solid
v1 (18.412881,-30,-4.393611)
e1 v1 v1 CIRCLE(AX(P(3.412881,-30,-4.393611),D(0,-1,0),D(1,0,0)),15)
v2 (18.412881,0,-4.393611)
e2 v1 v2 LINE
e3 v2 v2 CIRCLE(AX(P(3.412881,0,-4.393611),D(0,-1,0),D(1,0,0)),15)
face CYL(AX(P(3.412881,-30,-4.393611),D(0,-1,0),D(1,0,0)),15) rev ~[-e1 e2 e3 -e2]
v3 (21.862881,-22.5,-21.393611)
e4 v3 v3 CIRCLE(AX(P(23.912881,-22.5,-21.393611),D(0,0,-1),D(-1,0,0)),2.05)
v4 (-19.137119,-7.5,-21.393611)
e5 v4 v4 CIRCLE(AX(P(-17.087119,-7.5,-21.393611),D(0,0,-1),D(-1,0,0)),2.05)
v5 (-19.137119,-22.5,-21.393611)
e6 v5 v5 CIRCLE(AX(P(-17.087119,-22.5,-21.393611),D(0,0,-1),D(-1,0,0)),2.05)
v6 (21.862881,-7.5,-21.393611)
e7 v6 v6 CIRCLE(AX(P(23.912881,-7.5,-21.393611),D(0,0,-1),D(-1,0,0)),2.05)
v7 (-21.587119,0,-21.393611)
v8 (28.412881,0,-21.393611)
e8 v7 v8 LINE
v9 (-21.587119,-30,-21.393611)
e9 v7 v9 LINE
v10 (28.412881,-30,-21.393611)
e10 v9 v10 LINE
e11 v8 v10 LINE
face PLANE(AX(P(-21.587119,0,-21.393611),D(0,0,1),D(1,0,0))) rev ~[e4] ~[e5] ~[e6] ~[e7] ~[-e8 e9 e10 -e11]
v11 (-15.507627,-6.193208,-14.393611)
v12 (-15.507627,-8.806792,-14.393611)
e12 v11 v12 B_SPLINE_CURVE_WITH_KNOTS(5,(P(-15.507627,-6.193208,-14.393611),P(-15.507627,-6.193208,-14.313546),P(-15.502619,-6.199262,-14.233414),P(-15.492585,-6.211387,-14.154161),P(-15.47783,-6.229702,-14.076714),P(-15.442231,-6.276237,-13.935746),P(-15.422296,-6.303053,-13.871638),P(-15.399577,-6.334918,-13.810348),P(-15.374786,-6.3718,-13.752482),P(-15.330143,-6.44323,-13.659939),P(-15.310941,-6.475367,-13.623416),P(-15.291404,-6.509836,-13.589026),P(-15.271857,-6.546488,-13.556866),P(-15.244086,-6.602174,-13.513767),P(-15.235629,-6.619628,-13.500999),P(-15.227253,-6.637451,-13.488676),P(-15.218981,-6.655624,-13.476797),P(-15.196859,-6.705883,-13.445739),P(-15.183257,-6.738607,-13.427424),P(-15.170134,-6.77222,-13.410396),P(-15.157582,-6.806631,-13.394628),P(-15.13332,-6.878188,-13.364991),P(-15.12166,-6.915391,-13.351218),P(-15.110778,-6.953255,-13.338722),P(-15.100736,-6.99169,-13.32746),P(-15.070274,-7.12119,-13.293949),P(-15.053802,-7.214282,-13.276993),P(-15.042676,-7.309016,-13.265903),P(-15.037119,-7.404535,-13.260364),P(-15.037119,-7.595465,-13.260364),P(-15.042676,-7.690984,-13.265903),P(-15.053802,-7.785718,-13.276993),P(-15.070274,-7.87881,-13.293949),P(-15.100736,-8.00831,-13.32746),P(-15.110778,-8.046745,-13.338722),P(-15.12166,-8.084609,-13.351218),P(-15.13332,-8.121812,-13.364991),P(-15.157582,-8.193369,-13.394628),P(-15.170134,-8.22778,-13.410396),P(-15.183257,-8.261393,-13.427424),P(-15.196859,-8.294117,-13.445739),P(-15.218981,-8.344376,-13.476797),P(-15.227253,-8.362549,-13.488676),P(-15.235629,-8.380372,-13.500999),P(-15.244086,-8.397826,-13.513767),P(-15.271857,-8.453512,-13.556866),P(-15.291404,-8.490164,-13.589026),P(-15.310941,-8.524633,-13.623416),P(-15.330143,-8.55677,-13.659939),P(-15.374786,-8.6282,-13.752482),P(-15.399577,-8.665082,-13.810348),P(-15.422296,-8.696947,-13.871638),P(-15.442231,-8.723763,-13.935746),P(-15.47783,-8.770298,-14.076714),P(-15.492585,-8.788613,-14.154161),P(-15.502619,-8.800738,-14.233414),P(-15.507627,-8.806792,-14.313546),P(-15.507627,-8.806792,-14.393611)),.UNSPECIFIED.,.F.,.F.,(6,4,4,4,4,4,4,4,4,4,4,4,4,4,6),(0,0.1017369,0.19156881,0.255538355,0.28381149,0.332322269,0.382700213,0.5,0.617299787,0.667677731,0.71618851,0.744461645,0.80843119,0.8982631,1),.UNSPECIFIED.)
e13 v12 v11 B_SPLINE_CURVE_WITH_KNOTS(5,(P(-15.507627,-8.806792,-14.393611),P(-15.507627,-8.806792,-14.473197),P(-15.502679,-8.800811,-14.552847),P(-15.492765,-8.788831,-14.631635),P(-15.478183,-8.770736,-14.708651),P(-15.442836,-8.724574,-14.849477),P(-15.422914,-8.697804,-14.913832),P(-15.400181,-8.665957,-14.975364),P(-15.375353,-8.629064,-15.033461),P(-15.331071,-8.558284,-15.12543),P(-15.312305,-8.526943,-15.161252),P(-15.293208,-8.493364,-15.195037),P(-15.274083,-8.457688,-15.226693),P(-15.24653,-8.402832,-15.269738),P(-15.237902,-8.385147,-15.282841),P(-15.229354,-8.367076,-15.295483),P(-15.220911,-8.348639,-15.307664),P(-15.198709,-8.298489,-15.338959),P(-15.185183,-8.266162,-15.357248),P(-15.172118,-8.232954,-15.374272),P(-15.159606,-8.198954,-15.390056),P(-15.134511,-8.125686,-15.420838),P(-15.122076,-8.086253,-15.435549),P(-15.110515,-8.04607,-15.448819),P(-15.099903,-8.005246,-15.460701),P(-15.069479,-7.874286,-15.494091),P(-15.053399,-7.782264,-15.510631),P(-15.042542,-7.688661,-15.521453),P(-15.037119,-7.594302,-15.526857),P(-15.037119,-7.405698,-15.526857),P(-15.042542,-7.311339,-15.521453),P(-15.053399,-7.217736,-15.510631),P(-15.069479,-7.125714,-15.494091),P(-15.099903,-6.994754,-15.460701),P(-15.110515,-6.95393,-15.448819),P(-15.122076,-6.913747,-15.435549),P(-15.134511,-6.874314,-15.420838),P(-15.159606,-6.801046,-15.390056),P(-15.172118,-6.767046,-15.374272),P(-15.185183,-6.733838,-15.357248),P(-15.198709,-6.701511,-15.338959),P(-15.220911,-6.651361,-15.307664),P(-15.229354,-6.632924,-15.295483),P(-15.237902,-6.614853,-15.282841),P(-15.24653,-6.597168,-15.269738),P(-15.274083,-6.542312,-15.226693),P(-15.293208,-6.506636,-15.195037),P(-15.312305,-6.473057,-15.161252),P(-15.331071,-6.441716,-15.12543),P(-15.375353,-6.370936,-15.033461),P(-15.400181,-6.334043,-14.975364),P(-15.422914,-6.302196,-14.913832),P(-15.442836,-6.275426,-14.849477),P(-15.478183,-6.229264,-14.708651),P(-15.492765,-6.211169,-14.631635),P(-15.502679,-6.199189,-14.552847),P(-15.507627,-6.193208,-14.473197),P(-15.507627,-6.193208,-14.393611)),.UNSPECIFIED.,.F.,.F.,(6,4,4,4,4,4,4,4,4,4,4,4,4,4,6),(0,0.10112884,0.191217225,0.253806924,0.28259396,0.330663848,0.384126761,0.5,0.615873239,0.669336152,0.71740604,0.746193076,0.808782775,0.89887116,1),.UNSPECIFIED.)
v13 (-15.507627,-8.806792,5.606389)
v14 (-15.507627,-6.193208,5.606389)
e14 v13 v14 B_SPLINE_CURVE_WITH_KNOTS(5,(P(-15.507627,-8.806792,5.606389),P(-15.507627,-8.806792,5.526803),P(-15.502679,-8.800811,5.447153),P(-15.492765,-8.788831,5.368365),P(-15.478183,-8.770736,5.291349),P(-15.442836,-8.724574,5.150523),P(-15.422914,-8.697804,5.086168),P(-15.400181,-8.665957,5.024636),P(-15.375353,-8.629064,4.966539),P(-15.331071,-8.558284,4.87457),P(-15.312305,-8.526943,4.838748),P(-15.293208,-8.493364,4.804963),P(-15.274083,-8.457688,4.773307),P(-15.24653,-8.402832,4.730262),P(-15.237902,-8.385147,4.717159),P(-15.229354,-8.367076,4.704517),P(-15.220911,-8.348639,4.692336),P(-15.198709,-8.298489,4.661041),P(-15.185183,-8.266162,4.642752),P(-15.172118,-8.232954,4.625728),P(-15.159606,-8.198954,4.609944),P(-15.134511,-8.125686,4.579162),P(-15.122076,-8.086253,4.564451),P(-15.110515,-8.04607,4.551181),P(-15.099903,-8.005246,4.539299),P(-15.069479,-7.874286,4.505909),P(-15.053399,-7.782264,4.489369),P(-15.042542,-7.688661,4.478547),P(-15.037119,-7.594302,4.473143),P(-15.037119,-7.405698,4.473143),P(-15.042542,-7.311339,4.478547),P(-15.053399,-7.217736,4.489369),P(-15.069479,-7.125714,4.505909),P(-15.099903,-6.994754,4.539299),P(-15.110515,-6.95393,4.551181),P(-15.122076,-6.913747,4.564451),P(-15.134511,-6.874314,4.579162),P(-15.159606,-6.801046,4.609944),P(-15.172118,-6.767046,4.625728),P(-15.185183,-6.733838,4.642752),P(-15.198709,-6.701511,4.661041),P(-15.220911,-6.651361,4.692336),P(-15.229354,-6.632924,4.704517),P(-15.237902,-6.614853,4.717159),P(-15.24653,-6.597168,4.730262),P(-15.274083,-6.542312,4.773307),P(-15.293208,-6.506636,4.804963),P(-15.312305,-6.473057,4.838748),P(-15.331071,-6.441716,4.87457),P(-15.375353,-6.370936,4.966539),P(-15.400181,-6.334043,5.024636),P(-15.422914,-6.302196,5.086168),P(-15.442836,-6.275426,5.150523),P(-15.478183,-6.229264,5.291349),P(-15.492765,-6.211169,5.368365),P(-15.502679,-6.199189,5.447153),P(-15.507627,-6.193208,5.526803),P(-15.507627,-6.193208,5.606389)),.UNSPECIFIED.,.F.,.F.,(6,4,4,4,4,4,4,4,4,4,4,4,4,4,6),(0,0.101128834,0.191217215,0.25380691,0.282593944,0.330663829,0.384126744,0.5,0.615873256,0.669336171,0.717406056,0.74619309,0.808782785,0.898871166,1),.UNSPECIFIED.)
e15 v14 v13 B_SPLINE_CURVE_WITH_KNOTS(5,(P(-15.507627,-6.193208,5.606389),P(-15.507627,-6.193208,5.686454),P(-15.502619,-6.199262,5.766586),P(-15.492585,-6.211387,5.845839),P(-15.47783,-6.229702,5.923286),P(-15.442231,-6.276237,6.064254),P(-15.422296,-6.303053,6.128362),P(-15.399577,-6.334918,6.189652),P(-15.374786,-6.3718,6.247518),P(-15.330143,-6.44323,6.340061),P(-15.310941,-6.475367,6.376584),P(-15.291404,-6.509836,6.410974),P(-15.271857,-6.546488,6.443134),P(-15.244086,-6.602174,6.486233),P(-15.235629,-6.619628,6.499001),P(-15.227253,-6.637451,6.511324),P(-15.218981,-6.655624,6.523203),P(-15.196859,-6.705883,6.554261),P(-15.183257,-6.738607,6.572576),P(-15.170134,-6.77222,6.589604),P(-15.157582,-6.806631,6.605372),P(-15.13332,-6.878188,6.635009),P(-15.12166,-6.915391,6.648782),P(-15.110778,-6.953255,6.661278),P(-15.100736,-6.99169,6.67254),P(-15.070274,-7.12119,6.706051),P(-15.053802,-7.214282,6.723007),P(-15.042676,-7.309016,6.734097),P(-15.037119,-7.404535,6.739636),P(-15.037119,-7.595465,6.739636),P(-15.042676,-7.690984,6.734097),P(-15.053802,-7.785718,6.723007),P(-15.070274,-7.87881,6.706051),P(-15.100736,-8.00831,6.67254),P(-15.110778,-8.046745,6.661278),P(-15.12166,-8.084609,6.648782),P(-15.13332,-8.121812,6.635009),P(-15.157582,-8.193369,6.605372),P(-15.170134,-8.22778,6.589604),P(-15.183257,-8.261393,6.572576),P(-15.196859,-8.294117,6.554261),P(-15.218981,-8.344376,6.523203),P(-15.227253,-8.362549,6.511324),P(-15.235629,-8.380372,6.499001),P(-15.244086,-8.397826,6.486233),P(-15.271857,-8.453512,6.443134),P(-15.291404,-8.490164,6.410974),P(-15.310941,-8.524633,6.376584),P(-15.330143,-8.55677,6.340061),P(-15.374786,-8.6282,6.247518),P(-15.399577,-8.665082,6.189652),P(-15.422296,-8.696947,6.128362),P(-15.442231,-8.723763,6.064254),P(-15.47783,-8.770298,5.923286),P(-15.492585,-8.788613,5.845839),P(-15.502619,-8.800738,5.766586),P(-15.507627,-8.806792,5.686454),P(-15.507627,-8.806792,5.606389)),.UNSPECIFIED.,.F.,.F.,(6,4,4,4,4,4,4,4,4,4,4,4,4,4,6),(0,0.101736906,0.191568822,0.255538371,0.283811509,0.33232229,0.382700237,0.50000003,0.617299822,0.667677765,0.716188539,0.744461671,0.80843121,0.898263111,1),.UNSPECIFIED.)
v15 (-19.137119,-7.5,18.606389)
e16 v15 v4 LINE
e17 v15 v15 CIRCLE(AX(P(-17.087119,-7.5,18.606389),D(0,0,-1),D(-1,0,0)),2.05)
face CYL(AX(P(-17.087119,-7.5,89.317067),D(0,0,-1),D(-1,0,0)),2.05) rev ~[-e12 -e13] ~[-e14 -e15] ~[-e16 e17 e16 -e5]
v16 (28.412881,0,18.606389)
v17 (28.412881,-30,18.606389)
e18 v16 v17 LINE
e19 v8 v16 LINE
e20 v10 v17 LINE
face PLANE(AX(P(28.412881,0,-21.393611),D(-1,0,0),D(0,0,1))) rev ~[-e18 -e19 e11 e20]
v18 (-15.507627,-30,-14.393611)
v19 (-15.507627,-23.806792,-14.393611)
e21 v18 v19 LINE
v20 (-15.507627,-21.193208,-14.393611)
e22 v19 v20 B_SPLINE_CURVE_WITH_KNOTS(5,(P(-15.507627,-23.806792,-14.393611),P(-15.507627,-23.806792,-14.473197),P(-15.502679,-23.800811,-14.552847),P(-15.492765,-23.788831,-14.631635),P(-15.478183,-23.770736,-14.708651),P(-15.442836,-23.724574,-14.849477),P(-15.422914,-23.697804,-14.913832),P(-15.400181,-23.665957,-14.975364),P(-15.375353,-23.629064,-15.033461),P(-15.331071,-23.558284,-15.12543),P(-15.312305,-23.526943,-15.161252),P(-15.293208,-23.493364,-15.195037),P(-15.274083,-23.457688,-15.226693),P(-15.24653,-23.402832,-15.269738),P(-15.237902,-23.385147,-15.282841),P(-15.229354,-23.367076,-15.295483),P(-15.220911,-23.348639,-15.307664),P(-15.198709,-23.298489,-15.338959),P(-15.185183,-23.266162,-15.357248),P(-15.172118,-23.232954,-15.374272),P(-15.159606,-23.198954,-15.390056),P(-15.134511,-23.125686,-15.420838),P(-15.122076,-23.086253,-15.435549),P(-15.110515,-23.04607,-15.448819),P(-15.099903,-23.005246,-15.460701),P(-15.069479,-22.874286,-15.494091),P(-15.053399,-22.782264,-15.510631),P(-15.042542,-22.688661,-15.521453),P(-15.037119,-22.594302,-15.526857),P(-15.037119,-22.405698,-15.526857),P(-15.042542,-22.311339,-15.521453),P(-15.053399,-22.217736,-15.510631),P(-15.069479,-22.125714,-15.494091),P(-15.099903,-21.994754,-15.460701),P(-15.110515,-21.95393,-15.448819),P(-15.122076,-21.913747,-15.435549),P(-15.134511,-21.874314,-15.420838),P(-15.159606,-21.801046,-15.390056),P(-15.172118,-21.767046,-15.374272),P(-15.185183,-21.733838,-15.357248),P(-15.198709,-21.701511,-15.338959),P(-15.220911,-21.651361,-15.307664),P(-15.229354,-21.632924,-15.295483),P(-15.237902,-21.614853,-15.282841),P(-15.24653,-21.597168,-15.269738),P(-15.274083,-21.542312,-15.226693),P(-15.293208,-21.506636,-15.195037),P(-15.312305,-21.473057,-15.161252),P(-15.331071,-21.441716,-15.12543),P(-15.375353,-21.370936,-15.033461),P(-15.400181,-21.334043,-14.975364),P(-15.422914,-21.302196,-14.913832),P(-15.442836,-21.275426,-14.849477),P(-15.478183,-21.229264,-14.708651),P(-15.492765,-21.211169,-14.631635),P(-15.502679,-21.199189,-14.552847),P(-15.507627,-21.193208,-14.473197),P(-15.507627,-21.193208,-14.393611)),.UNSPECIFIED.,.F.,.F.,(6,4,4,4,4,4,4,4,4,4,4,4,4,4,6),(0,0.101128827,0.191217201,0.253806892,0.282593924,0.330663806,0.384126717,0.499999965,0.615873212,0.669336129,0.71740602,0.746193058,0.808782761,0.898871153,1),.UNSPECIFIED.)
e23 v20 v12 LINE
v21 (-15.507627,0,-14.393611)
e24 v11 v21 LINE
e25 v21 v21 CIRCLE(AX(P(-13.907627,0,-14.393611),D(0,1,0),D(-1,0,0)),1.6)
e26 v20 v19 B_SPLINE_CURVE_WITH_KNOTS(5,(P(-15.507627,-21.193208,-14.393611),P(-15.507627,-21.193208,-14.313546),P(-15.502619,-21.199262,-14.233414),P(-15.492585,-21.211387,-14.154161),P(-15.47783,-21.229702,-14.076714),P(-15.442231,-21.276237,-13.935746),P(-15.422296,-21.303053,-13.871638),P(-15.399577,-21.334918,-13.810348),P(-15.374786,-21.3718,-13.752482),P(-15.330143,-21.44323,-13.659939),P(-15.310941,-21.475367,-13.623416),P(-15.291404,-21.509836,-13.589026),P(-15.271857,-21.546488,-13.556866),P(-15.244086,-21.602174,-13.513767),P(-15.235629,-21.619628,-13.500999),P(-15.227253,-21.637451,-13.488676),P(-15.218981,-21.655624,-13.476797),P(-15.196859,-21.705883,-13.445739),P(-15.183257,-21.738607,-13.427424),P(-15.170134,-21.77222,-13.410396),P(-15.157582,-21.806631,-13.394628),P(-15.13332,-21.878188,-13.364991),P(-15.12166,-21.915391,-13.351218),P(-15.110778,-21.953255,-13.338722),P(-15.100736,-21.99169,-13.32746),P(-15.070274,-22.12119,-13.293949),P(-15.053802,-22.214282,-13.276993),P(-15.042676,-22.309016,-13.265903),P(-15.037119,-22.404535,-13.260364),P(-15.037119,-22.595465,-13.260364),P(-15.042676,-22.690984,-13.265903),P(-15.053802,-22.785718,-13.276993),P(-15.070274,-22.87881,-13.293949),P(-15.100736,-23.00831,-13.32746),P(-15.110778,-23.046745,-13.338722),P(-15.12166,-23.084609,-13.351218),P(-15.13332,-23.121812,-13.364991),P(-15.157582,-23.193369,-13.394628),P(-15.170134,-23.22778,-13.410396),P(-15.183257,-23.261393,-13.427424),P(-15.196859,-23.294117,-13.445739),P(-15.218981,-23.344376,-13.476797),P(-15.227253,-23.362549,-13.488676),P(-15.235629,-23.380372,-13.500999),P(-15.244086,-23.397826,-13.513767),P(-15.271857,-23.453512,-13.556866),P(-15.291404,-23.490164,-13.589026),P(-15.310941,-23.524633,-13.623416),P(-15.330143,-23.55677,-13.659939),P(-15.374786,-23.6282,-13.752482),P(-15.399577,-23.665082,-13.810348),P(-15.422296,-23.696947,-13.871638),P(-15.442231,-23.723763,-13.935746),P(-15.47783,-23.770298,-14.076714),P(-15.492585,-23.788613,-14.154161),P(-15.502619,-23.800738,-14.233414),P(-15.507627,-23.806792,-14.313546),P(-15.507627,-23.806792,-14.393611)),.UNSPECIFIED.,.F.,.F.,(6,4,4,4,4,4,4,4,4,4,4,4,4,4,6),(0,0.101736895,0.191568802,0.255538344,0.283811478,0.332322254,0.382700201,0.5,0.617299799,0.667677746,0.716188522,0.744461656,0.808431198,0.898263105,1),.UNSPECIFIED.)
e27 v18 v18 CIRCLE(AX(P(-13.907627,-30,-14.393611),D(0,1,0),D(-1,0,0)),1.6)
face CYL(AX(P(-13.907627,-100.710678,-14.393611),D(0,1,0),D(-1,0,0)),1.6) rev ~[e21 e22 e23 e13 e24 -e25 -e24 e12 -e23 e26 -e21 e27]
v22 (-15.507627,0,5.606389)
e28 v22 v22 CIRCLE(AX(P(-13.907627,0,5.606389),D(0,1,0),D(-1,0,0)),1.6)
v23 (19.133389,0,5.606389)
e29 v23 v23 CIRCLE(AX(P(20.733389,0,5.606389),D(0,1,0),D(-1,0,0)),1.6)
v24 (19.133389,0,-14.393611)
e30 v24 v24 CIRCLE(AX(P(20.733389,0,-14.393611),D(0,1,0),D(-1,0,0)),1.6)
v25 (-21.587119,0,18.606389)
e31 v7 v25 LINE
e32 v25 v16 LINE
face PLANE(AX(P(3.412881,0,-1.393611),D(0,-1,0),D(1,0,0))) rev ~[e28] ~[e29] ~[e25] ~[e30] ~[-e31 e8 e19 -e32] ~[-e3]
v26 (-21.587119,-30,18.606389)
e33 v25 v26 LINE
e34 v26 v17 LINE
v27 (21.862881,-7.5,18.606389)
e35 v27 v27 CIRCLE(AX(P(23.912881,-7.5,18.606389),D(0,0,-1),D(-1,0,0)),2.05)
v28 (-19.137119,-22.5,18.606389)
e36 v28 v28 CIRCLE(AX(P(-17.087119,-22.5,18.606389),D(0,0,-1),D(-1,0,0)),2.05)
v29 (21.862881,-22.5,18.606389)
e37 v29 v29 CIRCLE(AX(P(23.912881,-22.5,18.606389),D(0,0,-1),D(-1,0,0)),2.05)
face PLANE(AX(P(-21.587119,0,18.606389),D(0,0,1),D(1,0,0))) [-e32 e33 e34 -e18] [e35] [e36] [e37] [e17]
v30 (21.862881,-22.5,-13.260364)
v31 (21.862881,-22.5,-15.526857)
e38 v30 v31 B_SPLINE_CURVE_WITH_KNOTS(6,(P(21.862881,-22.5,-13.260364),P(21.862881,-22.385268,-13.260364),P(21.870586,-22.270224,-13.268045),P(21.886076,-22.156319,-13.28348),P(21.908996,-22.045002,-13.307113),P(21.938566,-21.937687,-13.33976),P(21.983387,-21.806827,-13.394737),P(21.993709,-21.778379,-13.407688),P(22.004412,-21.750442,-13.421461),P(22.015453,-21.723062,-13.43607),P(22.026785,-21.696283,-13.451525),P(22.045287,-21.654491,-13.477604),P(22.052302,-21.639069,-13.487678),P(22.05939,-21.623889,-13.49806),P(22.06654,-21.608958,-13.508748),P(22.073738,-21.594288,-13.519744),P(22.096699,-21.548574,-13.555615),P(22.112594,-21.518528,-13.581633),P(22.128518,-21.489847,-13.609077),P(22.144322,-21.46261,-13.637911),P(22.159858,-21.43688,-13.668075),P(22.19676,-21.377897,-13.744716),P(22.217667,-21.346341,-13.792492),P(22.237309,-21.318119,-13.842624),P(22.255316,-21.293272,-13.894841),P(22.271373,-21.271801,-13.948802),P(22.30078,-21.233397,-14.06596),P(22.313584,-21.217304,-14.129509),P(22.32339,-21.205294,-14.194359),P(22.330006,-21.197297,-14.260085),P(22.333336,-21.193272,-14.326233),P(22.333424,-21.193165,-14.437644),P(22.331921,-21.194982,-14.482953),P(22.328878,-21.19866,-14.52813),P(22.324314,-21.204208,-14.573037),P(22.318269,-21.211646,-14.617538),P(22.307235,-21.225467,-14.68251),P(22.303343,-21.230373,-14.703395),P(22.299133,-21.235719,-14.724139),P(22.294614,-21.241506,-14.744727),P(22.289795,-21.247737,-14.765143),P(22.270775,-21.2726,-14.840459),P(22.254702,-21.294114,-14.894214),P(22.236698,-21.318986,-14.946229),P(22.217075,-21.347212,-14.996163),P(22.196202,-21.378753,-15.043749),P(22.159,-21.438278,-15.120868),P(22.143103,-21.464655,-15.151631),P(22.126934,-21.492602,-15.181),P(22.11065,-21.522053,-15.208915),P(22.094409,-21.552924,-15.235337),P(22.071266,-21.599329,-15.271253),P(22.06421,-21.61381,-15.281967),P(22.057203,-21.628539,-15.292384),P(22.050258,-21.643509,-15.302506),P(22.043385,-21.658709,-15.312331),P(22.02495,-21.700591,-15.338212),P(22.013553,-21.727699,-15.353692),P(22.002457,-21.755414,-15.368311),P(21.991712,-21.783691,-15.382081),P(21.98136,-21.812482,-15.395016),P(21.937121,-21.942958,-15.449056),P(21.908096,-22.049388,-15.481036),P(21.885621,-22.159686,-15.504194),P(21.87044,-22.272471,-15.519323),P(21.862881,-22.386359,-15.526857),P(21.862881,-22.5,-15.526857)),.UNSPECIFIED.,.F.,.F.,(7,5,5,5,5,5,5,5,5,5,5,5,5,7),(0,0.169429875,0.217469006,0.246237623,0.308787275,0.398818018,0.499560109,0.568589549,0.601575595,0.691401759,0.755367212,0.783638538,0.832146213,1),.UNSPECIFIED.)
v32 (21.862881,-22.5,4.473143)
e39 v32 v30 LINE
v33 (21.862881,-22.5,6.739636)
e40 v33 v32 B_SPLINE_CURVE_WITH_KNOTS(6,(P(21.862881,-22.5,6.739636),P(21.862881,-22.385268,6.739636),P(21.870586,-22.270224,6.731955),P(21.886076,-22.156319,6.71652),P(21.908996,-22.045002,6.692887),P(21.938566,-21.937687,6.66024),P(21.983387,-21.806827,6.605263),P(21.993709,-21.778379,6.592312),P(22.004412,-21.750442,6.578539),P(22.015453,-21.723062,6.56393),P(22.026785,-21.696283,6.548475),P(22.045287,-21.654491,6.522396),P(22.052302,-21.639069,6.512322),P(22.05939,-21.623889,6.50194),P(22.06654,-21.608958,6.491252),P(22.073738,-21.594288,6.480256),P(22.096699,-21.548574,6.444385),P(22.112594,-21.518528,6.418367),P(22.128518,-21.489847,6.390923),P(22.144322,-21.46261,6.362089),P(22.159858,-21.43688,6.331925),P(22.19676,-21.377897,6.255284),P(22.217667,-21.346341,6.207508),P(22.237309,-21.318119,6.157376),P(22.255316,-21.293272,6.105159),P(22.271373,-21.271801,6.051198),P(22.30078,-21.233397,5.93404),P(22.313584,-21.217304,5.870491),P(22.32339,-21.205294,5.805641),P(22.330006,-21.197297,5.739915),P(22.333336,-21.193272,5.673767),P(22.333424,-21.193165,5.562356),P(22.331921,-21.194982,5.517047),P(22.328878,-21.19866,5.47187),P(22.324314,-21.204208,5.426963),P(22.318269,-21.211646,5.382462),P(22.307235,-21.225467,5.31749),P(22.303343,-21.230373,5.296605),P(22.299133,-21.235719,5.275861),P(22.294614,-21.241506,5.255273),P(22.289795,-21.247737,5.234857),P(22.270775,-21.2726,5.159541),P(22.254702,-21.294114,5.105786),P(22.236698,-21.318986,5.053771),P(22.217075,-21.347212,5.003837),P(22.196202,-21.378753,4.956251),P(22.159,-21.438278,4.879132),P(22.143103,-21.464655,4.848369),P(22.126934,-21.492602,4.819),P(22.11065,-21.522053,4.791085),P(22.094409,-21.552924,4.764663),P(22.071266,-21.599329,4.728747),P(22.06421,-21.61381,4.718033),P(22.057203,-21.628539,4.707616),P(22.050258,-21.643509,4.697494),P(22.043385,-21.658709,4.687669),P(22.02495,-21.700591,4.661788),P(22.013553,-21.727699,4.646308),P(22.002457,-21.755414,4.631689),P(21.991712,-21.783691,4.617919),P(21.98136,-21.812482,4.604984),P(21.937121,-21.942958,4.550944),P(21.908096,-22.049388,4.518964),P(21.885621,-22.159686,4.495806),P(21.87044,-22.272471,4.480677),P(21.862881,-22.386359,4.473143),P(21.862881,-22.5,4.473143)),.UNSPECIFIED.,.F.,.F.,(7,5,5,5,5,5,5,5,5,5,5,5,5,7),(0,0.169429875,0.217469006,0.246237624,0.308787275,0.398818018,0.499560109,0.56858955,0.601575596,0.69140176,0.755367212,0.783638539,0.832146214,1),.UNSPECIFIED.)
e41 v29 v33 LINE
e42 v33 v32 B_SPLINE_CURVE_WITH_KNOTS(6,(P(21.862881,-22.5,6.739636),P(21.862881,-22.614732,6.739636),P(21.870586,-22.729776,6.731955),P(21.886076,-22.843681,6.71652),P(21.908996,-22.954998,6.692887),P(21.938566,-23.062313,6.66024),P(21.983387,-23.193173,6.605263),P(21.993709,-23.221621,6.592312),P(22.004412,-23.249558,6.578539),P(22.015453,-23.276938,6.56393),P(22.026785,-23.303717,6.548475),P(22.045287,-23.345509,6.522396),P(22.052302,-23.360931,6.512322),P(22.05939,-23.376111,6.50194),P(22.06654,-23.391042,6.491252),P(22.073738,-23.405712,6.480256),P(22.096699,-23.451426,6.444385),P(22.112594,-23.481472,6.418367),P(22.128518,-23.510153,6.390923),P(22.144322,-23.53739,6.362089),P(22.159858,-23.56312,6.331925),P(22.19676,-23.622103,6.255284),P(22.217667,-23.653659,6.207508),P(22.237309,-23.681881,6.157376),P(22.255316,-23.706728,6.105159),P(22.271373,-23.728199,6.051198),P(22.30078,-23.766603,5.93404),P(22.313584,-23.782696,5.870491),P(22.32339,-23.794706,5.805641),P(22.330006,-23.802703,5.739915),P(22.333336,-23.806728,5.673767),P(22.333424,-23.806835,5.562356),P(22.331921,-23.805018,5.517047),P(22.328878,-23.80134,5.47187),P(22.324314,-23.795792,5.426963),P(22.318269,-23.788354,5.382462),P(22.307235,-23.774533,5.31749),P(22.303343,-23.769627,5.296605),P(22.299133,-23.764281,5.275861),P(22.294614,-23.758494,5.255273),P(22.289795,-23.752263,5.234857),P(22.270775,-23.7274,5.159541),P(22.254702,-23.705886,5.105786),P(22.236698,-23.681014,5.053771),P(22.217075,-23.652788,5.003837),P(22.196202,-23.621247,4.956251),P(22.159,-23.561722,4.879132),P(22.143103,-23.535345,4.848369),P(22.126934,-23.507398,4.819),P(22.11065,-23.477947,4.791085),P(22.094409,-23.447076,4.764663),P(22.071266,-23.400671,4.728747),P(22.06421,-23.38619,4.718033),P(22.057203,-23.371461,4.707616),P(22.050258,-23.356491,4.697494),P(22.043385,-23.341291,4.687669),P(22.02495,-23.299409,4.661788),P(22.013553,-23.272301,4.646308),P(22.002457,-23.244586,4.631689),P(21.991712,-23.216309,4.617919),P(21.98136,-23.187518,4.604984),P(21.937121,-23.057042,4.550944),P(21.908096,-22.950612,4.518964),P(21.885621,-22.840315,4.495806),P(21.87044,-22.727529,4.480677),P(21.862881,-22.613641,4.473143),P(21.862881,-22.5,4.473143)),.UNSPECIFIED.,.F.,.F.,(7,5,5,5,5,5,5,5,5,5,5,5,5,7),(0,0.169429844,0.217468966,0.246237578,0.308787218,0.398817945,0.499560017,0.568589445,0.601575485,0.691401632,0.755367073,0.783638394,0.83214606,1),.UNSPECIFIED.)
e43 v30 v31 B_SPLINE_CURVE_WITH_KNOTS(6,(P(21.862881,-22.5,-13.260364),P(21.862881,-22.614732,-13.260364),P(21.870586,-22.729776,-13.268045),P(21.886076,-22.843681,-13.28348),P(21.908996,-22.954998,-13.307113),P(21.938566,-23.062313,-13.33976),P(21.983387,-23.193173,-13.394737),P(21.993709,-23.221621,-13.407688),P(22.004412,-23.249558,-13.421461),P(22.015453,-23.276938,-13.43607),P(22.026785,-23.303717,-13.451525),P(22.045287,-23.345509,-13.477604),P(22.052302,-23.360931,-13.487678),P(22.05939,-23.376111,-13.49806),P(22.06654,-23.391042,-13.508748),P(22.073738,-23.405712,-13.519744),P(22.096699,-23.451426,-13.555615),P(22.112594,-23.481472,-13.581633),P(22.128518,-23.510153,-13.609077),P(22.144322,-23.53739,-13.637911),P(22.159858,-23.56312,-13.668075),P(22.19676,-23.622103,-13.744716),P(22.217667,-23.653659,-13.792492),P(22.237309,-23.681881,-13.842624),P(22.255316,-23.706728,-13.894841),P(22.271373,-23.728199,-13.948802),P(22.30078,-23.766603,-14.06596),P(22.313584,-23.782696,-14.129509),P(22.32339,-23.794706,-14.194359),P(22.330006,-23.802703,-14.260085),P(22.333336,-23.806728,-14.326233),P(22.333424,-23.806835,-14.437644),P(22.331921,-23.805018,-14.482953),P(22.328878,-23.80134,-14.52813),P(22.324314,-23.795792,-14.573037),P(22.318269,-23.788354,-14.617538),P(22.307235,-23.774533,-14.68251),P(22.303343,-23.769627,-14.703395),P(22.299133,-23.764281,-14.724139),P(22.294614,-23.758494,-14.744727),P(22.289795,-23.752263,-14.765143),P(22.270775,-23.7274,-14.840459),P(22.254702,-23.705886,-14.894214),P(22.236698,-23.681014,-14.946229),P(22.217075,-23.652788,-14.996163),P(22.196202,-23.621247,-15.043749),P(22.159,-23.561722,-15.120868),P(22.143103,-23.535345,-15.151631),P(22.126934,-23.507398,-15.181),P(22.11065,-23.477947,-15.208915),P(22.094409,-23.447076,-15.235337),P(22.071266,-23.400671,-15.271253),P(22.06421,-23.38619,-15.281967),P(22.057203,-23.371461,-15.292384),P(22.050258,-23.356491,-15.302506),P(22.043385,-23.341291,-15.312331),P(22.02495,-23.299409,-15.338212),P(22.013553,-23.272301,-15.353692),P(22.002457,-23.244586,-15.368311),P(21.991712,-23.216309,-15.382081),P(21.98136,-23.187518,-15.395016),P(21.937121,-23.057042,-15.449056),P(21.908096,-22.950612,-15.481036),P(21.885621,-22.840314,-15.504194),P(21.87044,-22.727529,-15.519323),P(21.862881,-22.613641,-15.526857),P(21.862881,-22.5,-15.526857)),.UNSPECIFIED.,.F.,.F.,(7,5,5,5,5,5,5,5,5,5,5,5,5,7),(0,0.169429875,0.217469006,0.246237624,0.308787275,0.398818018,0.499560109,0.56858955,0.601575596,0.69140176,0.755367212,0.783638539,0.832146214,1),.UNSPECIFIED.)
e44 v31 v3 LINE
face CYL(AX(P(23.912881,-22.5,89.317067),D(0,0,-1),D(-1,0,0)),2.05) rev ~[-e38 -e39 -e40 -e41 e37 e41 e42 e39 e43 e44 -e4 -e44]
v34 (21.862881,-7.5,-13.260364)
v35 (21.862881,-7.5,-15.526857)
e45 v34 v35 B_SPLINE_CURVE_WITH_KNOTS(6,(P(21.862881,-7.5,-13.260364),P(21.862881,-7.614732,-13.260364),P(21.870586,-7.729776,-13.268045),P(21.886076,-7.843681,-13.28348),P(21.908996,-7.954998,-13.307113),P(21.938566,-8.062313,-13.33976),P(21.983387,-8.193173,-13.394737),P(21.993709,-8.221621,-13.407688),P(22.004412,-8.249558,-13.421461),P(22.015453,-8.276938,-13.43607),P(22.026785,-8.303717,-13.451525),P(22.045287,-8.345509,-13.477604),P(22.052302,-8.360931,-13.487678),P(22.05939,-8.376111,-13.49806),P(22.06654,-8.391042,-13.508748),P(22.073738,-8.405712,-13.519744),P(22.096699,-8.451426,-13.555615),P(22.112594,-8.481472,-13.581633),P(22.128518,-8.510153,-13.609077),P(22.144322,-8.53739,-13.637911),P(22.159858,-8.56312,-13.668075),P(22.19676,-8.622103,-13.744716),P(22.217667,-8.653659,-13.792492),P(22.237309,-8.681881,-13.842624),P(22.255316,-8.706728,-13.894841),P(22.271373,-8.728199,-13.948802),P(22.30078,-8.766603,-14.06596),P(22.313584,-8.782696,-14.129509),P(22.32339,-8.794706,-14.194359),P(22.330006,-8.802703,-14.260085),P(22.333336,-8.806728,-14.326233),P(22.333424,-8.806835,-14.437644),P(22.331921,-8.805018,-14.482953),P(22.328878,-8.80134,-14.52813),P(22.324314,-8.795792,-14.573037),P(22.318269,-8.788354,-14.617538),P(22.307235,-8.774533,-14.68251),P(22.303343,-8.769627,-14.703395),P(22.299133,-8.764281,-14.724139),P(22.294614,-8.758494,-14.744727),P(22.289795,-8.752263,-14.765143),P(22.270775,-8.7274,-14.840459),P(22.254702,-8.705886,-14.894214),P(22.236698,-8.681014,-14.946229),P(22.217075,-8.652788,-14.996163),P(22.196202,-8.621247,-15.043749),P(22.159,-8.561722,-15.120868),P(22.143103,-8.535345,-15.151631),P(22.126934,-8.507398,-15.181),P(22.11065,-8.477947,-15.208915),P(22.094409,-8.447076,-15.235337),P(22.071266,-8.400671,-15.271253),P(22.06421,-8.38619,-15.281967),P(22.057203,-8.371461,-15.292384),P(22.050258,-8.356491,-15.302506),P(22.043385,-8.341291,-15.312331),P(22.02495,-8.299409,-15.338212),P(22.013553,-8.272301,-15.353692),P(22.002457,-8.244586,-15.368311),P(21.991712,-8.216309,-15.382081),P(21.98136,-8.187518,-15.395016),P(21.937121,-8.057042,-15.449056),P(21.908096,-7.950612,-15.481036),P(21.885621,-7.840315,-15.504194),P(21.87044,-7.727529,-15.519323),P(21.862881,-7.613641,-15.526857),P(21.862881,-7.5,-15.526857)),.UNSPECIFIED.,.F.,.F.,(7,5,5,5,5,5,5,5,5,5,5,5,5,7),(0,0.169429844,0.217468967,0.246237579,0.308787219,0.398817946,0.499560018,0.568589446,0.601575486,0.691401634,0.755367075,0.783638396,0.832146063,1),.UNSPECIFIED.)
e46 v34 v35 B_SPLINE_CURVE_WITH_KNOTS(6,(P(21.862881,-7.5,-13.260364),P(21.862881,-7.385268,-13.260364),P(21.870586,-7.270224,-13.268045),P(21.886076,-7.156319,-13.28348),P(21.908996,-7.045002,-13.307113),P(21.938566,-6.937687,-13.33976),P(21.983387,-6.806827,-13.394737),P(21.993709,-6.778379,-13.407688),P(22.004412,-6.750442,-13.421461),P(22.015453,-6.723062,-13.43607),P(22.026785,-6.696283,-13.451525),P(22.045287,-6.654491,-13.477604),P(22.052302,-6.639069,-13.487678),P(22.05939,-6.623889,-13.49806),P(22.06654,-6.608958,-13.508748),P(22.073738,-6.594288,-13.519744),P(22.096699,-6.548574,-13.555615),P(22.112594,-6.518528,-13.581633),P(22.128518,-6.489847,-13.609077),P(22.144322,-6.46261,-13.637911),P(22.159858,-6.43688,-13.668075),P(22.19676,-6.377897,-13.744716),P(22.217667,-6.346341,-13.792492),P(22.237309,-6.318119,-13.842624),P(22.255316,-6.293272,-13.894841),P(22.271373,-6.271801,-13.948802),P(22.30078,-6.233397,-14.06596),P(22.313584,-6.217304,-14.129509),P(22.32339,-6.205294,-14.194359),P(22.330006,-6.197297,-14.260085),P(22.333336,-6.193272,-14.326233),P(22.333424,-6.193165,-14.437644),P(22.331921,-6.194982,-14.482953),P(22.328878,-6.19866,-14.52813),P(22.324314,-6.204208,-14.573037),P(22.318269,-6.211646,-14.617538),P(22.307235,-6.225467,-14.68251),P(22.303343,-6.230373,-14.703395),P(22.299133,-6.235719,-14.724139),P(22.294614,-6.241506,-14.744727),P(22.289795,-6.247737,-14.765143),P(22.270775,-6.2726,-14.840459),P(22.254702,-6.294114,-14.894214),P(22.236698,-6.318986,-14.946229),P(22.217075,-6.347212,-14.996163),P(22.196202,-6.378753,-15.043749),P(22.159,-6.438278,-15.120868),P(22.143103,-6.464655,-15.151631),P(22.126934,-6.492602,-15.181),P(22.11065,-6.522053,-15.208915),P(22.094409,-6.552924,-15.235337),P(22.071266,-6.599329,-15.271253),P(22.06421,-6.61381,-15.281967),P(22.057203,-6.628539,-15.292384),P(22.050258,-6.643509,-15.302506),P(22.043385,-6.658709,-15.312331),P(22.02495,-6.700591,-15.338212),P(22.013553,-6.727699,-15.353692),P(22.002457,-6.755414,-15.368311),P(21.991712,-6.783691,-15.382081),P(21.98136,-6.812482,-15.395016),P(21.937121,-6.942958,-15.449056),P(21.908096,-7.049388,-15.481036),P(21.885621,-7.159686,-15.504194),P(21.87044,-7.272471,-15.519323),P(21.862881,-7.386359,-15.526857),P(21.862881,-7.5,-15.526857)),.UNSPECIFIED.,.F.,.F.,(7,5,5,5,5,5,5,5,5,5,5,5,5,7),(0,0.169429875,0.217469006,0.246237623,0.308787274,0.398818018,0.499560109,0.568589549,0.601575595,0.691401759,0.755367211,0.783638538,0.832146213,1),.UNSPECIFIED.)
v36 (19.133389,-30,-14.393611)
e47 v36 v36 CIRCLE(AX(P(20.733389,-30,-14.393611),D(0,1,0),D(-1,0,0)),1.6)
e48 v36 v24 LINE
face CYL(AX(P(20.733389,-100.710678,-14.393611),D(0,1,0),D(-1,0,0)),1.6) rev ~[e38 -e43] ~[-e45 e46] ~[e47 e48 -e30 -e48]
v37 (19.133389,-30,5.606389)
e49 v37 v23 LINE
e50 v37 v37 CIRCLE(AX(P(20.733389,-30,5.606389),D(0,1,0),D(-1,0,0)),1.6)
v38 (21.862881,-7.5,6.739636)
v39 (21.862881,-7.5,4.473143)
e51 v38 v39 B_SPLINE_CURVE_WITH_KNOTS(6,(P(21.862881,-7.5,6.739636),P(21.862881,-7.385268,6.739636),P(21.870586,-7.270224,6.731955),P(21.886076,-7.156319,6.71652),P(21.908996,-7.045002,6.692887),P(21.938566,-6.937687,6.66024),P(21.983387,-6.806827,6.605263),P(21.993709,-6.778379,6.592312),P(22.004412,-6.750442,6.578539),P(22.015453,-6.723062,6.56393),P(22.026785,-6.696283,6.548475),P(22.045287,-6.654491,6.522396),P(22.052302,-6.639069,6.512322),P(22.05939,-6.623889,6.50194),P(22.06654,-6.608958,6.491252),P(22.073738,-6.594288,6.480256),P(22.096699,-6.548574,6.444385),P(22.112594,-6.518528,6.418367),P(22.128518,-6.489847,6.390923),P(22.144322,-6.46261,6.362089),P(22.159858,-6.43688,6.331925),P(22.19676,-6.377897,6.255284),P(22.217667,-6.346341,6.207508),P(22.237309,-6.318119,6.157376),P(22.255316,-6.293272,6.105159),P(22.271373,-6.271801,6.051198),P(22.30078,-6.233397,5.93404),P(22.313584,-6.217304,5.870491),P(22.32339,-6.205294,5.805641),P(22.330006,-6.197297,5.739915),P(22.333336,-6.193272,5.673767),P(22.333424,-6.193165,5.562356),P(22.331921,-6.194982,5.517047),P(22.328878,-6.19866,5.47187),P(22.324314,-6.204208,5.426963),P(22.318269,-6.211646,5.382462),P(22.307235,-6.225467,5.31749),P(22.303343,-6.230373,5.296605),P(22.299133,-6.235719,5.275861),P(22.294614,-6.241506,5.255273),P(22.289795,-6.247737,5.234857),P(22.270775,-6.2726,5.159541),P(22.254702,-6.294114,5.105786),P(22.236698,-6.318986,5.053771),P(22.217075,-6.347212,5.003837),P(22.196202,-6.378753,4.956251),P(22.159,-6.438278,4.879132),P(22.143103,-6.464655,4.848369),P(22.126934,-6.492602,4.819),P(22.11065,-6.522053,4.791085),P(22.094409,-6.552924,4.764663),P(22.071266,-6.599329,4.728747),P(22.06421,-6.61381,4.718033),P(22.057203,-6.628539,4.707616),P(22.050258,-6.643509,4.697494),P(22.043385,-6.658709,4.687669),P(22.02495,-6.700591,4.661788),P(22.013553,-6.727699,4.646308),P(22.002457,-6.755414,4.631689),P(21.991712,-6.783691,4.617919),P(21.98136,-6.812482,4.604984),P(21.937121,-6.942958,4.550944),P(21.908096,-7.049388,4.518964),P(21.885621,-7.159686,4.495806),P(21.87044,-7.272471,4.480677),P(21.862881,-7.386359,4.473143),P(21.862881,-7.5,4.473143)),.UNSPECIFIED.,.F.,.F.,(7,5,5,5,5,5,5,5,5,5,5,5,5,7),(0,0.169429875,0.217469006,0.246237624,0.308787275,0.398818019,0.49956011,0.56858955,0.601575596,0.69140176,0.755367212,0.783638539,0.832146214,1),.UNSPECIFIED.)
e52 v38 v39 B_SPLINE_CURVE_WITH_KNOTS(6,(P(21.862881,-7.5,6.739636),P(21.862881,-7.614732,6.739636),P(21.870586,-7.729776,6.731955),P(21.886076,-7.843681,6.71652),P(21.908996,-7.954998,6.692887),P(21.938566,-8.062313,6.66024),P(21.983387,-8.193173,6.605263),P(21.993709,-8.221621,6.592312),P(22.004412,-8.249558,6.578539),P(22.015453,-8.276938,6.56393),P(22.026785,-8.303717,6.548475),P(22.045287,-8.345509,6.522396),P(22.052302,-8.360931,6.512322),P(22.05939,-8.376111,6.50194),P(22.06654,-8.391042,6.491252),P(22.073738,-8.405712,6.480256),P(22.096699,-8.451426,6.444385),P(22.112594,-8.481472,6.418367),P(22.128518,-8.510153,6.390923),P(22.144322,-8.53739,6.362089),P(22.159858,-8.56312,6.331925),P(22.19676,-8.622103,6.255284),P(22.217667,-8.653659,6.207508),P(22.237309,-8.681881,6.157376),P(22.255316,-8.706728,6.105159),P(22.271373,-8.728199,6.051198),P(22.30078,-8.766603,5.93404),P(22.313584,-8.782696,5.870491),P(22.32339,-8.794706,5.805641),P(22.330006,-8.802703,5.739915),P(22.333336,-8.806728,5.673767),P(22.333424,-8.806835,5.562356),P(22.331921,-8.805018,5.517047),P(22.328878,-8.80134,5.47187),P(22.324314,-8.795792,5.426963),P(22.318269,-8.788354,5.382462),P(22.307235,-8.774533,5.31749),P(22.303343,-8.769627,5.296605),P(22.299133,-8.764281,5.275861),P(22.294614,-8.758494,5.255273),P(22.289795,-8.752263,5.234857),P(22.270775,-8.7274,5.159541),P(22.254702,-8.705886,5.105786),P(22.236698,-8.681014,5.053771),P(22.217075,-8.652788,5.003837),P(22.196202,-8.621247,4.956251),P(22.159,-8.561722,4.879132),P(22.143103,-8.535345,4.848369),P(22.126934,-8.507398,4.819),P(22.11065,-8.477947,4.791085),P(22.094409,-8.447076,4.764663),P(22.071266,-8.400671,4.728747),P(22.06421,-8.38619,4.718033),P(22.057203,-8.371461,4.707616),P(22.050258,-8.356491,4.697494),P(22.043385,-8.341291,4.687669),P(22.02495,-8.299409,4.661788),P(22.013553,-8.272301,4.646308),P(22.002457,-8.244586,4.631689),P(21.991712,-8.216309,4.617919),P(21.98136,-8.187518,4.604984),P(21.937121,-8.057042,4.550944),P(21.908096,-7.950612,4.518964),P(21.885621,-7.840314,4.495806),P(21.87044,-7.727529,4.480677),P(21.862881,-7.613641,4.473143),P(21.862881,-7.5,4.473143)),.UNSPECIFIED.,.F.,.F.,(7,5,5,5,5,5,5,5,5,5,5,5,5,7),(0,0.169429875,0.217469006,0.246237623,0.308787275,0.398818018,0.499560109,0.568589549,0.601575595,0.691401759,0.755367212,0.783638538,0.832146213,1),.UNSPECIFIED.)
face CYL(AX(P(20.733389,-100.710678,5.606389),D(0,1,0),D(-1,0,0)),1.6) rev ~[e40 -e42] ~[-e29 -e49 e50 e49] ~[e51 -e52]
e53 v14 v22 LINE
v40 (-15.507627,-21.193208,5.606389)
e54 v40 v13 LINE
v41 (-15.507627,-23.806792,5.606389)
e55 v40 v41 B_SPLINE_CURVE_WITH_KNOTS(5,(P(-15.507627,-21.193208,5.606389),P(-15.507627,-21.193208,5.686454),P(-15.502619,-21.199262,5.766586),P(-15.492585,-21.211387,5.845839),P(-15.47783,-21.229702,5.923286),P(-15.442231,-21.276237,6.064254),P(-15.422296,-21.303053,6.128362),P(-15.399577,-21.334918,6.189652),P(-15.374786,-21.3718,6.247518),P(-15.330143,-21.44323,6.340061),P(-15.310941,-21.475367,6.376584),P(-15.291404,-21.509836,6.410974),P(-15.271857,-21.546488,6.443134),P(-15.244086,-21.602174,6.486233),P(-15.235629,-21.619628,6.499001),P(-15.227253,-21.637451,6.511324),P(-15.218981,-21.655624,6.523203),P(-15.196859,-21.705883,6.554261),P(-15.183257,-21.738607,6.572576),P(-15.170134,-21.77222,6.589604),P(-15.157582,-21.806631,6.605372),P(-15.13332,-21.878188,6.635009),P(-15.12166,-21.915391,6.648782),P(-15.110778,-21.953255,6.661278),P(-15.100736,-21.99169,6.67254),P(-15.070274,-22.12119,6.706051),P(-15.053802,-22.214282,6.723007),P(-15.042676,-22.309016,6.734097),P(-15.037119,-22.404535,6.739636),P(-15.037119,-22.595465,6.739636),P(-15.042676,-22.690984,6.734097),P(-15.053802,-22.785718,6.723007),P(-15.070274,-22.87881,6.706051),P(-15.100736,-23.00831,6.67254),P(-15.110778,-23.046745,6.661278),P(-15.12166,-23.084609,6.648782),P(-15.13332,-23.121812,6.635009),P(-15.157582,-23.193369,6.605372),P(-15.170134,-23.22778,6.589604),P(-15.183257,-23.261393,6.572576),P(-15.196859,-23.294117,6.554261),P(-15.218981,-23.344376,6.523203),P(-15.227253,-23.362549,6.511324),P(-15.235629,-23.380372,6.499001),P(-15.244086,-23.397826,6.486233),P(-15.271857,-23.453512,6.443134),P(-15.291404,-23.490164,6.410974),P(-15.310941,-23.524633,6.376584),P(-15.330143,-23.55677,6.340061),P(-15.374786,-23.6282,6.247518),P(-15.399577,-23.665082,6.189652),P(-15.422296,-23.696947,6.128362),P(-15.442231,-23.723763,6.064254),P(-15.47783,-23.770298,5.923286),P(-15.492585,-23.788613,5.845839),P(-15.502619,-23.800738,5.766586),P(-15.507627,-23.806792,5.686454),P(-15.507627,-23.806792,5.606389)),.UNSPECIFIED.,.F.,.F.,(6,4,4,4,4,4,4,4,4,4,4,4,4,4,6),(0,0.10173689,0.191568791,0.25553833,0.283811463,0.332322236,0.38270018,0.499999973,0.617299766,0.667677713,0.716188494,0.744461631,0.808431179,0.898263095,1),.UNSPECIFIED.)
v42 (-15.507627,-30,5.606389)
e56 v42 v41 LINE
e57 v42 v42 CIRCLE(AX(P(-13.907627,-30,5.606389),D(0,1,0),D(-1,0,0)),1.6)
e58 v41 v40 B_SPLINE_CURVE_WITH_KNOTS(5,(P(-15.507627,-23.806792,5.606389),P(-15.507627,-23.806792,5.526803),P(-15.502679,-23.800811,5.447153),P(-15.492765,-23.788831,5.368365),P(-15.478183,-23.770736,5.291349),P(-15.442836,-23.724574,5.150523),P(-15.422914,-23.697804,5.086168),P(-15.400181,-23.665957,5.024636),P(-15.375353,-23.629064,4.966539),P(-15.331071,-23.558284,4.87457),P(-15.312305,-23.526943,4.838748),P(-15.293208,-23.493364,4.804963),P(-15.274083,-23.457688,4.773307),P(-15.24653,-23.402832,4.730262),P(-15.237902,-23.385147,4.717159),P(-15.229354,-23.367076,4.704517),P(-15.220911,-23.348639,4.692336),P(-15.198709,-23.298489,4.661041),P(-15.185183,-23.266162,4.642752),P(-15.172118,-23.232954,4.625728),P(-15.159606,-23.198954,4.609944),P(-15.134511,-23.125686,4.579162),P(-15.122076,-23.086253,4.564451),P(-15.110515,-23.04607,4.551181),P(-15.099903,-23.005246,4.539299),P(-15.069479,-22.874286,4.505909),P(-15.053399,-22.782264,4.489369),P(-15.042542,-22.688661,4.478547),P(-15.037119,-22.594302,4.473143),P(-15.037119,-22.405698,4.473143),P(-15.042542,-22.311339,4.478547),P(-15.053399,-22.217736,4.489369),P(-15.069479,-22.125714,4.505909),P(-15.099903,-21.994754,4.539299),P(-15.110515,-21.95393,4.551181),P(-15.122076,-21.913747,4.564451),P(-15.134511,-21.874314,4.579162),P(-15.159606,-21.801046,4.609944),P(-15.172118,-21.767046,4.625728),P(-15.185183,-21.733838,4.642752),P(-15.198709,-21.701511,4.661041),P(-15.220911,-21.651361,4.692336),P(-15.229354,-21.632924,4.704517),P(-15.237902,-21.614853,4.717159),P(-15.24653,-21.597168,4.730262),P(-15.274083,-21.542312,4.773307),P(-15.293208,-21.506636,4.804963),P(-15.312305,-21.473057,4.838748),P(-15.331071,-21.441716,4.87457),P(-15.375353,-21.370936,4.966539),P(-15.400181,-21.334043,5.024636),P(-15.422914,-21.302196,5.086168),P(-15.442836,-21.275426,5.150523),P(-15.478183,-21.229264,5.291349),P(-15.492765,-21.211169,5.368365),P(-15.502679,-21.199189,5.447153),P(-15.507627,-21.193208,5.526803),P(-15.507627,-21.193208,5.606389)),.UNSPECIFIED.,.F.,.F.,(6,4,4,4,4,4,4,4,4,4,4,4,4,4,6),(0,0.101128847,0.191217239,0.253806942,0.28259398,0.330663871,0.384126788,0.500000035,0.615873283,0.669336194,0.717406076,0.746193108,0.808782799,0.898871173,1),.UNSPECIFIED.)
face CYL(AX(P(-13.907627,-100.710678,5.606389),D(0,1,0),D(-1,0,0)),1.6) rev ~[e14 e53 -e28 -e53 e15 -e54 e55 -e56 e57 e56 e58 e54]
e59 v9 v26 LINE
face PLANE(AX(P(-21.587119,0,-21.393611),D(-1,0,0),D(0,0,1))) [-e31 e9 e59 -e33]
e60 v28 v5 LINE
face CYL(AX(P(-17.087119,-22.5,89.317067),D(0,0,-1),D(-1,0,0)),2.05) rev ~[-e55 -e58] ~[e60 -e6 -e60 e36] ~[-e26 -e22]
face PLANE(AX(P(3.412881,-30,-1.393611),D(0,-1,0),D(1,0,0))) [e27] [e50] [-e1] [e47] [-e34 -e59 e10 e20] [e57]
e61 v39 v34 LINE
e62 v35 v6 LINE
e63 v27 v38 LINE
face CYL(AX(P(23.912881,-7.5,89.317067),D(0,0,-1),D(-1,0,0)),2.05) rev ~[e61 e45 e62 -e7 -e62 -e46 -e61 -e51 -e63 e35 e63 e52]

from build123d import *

# Parameters (mm, degrees)
F0_W     = 50
F0_H     = 40
F1_DEPTH = 30
F2_R     = 15
F3_DEPTH = 30.001
F4_D     = 3.2
F6_D     = 4.1


# Not quite as in the source:
# - a feature names something its author has since deleted; it is built from what else it names


with BuildPart() as f1:
    # F0 (on Front) → F1 (new body)
    with BuildSketch(Plane.XZ):
        with Locations((3.412880823, -1.3936108311)):
            Rectangle(F0_W, F0_H)
    extrude(amount=F1_DEPTH)

    # F2 (on face) → F3 (cut, through all)
    with BuildSketch(Plane.XZ.offset(30)):
        with Locations((3.412880823, -4.3936108311)):
            Circle(F2_R)
    extrude(amount=-F3_DEPTH, mode=Mode.SUBTRACT)

    # F4 (through all)
    with Locations(Plane.XZ.offset(30)):
        with Locations((-13.9076272527, -14.3936108311), (-13.9076272527, 5.6063891689), (20.7333888987, 5.6063891689), (20.7333888987, -14.3936108311)):
            Hole(F4_D / 2)

    # F6 (through all)
    with Locations(Plane.XY.offset(18.6063891689)):
        with Locations((23.912880823, -22.5), (23.912880823, -7.5), (-17.087119177, -7.5), (-17.087119177, -22.5)):
            Hole(F6_D / 2)


solid = f1.part
